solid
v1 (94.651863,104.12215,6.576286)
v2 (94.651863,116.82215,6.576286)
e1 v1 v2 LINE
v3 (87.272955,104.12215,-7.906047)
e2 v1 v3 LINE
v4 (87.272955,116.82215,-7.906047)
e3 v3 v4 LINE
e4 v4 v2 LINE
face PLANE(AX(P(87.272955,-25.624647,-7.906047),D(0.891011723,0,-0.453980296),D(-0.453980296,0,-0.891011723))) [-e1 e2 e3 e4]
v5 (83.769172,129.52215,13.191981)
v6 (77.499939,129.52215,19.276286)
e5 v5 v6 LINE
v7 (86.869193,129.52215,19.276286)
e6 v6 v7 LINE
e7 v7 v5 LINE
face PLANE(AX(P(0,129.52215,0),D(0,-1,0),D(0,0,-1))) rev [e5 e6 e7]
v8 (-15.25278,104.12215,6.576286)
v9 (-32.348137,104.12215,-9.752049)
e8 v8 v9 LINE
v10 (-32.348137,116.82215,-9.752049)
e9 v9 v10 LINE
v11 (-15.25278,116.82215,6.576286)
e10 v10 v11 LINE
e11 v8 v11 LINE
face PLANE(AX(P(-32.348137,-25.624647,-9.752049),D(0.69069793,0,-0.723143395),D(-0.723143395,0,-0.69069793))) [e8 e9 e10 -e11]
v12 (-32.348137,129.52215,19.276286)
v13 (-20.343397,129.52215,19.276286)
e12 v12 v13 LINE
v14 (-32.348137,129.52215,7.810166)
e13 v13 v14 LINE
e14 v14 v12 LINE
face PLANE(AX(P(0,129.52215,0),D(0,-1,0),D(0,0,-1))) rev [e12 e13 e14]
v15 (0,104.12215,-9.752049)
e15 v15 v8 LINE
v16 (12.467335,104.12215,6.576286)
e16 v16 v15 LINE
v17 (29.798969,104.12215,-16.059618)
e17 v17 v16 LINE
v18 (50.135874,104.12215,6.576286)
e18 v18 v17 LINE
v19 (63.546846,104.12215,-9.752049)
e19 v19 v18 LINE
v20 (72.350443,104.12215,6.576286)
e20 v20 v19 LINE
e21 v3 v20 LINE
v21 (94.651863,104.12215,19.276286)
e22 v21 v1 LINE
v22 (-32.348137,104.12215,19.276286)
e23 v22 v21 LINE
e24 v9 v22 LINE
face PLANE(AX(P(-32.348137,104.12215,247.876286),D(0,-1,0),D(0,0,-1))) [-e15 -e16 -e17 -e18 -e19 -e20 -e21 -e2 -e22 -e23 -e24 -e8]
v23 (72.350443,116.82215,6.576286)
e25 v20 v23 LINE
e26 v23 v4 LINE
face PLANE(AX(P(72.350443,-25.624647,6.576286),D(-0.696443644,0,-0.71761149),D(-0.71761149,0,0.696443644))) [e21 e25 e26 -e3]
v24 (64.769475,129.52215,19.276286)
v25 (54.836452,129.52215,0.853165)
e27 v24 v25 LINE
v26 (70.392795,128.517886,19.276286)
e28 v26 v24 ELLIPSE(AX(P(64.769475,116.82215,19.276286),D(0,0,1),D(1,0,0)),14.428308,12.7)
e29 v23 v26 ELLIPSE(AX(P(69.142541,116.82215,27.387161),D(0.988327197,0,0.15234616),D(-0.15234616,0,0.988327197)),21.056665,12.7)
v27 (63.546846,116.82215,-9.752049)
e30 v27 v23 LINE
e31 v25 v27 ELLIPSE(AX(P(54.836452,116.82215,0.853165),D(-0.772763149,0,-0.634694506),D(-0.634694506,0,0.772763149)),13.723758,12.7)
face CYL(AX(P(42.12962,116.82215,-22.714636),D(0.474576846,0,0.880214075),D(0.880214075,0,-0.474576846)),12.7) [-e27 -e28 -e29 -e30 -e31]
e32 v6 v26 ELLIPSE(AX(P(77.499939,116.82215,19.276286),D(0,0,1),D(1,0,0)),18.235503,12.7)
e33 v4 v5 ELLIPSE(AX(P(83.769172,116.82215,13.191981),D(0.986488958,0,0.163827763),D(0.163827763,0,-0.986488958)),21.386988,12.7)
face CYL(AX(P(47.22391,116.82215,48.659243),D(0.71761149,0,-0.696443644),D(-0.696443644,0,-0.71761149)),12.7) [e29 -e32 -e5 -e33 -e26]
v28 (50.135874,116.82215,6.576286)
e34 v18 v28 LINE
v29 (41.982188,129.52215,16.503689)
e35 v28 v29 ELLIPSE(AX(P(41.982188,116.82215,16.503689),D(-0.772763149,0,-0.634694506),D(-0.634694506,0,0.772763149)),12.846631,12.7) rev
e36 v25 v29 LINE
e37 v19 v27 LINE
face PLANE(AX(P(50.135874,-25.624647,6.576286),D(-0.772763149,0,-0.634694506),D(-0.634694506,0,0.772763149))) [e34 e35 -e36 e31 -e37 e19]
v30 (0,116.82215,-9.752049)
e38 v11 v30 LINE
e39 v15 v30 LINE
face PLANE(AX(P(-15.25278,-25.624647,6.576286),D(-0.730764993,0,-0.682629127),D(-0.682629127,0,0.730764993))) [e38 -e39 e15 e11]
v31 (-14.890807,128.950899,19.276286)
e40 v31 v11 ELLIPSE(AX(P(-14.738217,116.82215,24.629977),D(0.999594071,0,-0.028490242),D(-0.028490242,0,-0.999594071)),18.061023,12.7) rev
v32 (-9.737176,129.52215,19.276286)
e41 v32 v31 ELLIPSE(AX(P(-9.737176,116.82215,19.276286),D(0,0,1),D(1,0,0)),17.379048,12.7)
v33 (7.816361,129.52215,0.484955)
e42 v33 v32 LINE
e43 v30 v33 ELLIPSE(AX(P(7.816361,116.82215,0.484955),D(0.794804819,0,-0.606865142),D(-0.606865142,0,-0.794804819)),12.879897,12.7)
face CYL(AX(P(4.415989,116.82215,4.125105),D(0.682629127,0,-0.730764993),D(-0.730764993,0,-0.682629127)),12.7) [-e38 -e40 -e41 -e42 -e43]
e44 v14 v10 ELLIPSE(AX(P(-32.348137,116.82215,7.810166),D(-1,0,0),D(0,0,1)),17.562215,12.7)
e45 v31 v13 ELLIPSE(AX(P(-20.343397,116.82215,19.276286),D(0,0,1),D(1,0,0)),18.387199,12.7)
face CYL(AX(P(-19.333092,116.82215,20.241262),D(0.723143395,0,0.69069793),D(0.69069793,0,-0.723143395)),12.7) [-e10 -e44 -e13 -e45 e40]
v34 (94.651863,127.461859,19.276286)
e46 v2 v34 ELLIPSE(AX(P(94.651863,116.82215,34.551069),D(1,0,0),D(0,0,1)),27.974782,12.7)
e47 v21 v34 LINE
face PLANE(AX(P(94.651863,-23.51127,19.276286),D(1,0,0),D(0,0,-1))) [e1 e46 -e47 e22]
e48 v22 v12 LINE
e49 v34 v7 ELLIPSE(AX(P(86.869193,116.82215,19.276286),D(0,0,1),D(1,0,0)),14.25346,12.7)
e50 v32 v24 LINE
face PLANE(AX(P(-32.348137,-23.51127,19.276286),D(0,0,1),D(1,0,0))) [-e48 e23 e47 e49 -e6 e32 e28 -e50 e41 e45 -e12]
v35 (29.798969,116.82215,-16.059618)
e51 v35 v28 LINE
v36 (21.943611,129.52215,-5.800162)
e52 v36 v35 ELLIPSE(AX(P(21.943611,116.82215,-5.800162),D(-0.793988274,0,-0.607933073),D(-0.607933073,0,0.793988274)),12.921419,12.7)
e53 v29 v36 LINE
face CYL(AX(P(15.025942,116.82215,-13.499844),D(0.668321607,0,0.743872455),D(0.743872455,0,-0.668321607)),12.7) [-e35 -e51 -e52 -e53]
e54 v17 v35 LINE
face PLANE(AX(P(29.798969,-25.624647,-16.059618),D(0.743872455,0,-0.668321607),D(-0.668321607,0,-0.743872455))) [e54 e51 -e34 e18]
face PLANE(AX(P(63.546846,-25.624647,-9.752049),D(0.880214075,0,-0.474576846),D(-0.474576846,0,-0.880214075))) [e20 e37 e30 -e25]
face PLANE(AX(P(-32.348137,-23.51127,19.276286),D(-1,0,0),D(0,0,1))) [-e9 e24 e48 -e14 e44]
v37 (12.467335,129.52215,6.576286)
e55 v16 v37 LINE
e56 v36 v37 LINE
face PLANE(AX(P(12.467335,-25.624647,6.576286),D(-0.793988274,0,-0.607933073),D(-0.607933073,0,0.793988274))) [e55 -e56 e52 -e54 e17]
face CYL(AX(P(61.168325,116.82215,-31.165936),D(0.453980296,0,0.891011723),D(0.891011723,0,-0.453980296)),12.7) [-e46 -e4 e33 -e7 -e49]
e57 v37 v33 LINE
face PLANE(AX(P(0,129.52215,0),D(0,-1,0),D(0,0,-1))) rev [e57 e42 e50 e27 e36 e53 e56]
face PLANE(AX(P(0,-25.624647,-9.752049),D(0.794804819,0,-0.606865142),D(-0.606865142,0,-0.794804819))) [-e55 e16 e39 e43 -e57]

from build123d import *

# Parameters (mm, degrees)
SKETCH1_W           = 127
SKETCH1_H           = 12.7
BOSS_EXTRUDE1_DEPTH = 25.4
BOSS_EXTRUDE2_DEPTH = 25.4
FILLET2_R           = 12.7


with BuildPart() as part:
    # Sketch1 → Boss-Extrude1 (new body)
    with BuildSketch(Plane(origin=(0, 129.522150418, 0), x_dir=(1, 0, 0), z_dir=(0, 1, 0))):
        with Locations((31.151863223, -12.926286206)):
            Rectangle(SKETCH1_W, SKETCH1_H)
    extrude(amount=-BOSS_EXTRUDE1_DEPTH)

    # Sketch2 → Boss-Extrude2 (add)
    with BuildSketch(Plane(origin=(0, 129.522150418, 0), x_dir=(1, 0, 0), z_dir=(0, 1, 0))):
        Polygon((-32.348136777, -6.576286206), (-32.348136777, 9.752049173), (-15.252779509, -6.576286206), (0, 9.752049173), (12.467334528, -6.576286206), (29.798968938, 16.059617503), (50.135874056, -6.576286206), (63.546845791, 9.752049173), (72.350442693, -6.576286206), (87.272954796, 7.906046983), (94.651863223, -6.576286206), (94.651863223, -10.496577103), (-32.348136777, -10.496577103), align=None)
    extrude(amount=-BOSS_EXTRUDE2_DEPTH)

    # Fillet2
    # the kernel refuses this fillet: 12.7 mm, written as the material it takes off along each edge
    with BuildSketch(Plane(origin=(-55.307939563, 129.522150418, -31.681708451), x_dir=(0, -1, 0), z_dir=(0.7231433948257096, 0, 0.6906979300098909))) as fillet2_piece_1_section:
        with BuildLine():
            CenterArc((FILLET2_R, -FILLET2_R), FILLET2_R, 90, 90)
            Line((0, -FILLET2_R), (-FILLET2_R * 0.02, -FILLET2_R))
            Line((-FILLET2_R * 0.02, -FILLET2_R), (-FILLET2_R * 0.02, FILLET2_R * 0.02))
            Line((-FILLET2_R * 0.02, FILLET2_R * 0.02), (FILLET2_R, FILLET2_R * 0.02))
            Line((FILLET2_R, FILLET2_R * 0.02), (FILLET2_R, 0))
        make_face()
    fillet2_piece_1 = extrude(amount=87.140342137, mode=Mode.PRIVATE)
    fillet2_piece_1 = split(fillet2_piece_1, bisect_by=Plane(origin=(-32.348136777, 126.447150631, 1.093343092), z_dir=(1, 0, 0)), keep=Keep.TOP, mode=Mode.PRIVATE)
    fillet2_piece_1 = split(fillet2_piece_1, bisect_by=Plane(origin=(-16.904261861, 126.447150631, 8.344223498), z_dir=(-0.7307649934126457, 0, -0.682629126541357)), keep=Keep.TOP, mode=Mode.PRIVATE)
    add(fillet2_piece_1, mode=Mode.SUBTRACT)
    with BuildSketch(Plane(origin=(-36.926254277, 129.522150418, 29.778074747), x_dir=(0, -1, 0), z_dir=(0.682629126541357, 0, -0.7307649934126457))) as fillet2_piece_2_section:
        with BuildLine():
            CenterArc((FILLET2_R, -FILLET2_R), FILLET2_R, 90, 90)
            Line((0, -FILLET2_R), (-FILLET2_R * 0.02, -FILLET2_R))
            Line((-FILLET2_R * 0.02, -FILLET2_R), (-FILLET2_R * 0.02, FILLET2_R * 0.02))
            Line((-FILLET2_R * 0.02, FILLET2_R * 0.02), (FILLET2_R, FILLET2_R * 0.02))
            Line((FILLET2_R, FILLET2_R * 0.02), (FILLET2_R, 0))
        make_face()
    fillet2_piece_2 = extrude(amount=85.844167449, mode=Mode.PRIVATE)
    fillet2_piece_2 = split(fillet2_piece_2, bisect_by=Plane(origin=(-13.300421888, 126.615006844, 8.441046884), z_dir=(0.6906979300098909, 0, -0.7231433948257096)), keep=Keep.TOP, mode=Mode.PRIVATE)
    fillet2_piece_2 = split(fillet2_piece_2, bisect_by=Plane(origin=(2.843037706, 126.615006844, -6.02855294), z_dir=(-0.7948048188192111, 0, 0.6068651415114903)), keep=Keep.TOP, mode=Mode.PRIVATE)
    add(fillet2_piece_2, mode=Mode.SUBTRACT)
    with BuildSketch(Plane(origin=(72.859080389, 129.522150418, -36.195669189), x_dir=(0, -1, 0), z_dir=(0.45398029626708136, 0, 0.8910117230436719))) as fillet2_piece_3_section:
        with BuildLine():
            CenterArc((FILLET2_R, -FILLET2_R), FILLET2_R, 90, 90)
            Line((0, -FILLET2_R), (-FILLET2_R * 0.02, -FILLET2_R))
            Line((-FILLET2_R * 0.02, -FILLET2_R), (-FILLET2_R * 0.02, FILLET2_R * 0.02))
            Line((-FILLET2_R * 0.02, FILLET2_R * 0.02), (FILLET2_R, FILLET2_R * 0.02))
            Line((FILLET2_R, FILLET2_R * 0.02), (FILLET2_R, 0))
        make_face()
    fillet2_piece_3 = extrude(amount=79.753807682, mode=Mode.PRIVATE)
    fillet2_piece_3 = split(fillet2_piece_3, bisect_by=Plane(origin=(82.345210733, 126.995605854, -3.123659748), z_dir=(0.6964436437658211, 0, 0.7176114903331651)), keep=Keep.TOP, mode=Mode.PRIVATE)
    fillet2_piece_3 = split(fillet2_piece_3, bisect_by=Plane(origin=(94.651863223, 126.995605854, 4.414676038), z_dir=(-1, 0, 0)), keep=Keep.TOP, mode=Mode.PRIVATE)
    add(fillet2_piece_3, mode=Mode.SUBTRACT)
    with BuildSketch(Plane(origin=(49.566277875, 129.522150418, 28.688371895), x_dir=(0, -1, 0), z_dir=(0.7176114903331651, 0, -0.6964436437658211))) as fillet2_piece_4_section:
        with BuildLine():
            CenterArc((FILLET2_R, -FILLET2_R), FILLET2_R, 90, 90)
            Line((0, -FILLET2_R), (-FILLET2_R * 0.02, -FILLET2_R))
            Line((-FILLET2_R * 0.02, -FILLET2_R), (-FILLET2_R * 0.02, FILLET2_R * 0.02))
            Line((-FILLET2_R * 0.02, FILLET2_R * 0.02), (FILLET2_R, FILLET2_R * 0.02))
            Line((FILLET2_R, FILLET2_R * 0.02), (FILLET2_R, 0))
        make_face()
    fillet2_piece_4 = extrude(amount=84.294695045, mode=Mode.PRIVATE)
    fillet2_piece_4 = split(fillet2_piece_4, bisect_by=Plane(origin=(72.424381475, 126.641527383, 6.713423019), z_dir=(0.8802140747510399, 0, -0.4745768458428739)), keep=Keep.TOP, mode=Mode.PRIVATE)
    fillet2_piece_4 = split(fillet2_piece_4, bisect_by=Plane(origin=(90.021052177, 126.641527383, -2.512449501), z_dir=(-0.8910117230436719, 0, 0.45398029626708136)), keep=Keep.TOP, mode=Mode.PRIVATE)
    add(fillet2_piece_4, mode=Mode.SUBTRACT)
    with BuildSketch(Plane(origin=(48.479030935, 129.522150418, -37.698846047), x_dir=(0, -1, 0), z_dir=(0.47457684584287385, 0, 0.8802140747510397))) as fillet2_piece_5_section:
        with BuildLine():
            CenterArc((FILLET2_R, -FILLET2_R), FILLET2_R, 90, 90)
            Line((0, -FILLET2_R), (-FILLET2_R * 0.02, -FILLET2_R))
            Line((-FILLET2_R * 0.02, -FILLET2_R), (-FILLET2_R * 0.02, FILLET2_R * 0.02))
            Line((-FILLET2_R * 0.02, FILLET2_R * 0.02), (FILLET2_R, FILLET2_R * 0.02))
            Line((FILLET2_R, FILLET2_R * 0.02), (FILLET2_R, 0))
        make_face()
    fillet2_piece_5 = extrude(amount=82.050413868, mode=Mode.PRIVATE)
    fillet2_piece_5 = split(fillet2_piece_5, bisect_by=Plane(origin=(59.422424103, 126.616162938, -4.730418982), z_dir=(0.7727631490947523, 0, 0.6346945055703268)), keep=Keep.TOP, mode=Mode.PRIVATE)
    fillet2_piece_5 = split(fillet2_piece_5, bisect_by=Plane(origin=(72.023472886, 126.616162938, 6.893611175), z_dir=(-0.6964436437658211, 0, -0.7176114903331651)), keep=Keep.TOP, mode=Mode.PRIVATE)
    add(fillet2_piece_5, mode=Mode.SUBTRACT)
    with BuildSketch(Plane(origin=(8.579757917, 129.522150418, -39.677567957), x_dir=(0, -1, 0), z_dir=(0.668321606968674, 0, 0.7438724552359828))) as fillet2_piece_6_section:
        with BuildLine():
            CenterArc((FILLET2_R, -FILLET2_R), FILLET2_R, 90, 90)
            Line((0, -FILLET2_R), (-FILLET2_R * 0.02, -FILLET2_R))
            Line((-FILLET2_R * 0.02, -FILLET2_R), (-FILLET2_R * 0.02, FILLET2_R * 0.02))
            Line((-FILLET2_R * 0.02, FILLET2_R * 0.02), (FILLET2_R, FILLET2_R * 0.02))
            Line((FILLET2_R, FILLET2_R * 0.02), (FILLET2_R, 0))
        make_face()
    fillet2_piece_6 = extrude(amount=93.929818377, mode=Mode.PRIVATE)
    fillet2_piece_6 = split(fillet2_piece_6, bisect_by=Plane(origin=(26.326574594, 126.641800239, -11.524512379), z_dir=(0.7939882740207107, 0, 0.6079330725644171)), keep=Keep.TOP, mode=Mode.PRIVATE)
    fillet2_piece_6 = split(fillet2_piece_6, bisect_by=Plane(origin=(49.745548911, 126.641800239, 7.051520961), z_dir=(-0.7727631490947523, 0, -0.6346945055703268)), keep=Keep.TOP, mode=Mode.PRIVATE)
    add(fillet2_piece_6, mode=Mode.SUBTRACT)
    with BuildSketch(Plane(origin=(-55.307939563, 129.522150418, -31.681708451), x_dir=(0, -1, 0), z_dir=(0.7231433948257096, 0, 0.6906979300098909))) as fillet2_piece_7a_section:
        with BuildLine():
            CenterArc((FILLET2_R, -FILLET2_R), FILLET2_R, 90, 90)
            Line((0, -FILLET2_R), (-FILLET2_R * 0.02, -FILLET2_R))
            Line((-FILLET2_R * 0.02, -FILLET2_R), (-FILLET2_R * 0.02, FILLET2_R * 0.02))
            Line((-FILLET2_R * 0.02, FILLET2_R * 0.02), (FILLET2_R, FILLET2_R * 0.02))
            Line((FILLET2_R, FILLET2_R * 0.02), (FILLET2_R, 0))
        make_face()
    fillet2_piece_7a = extrude(amount=87.140342137, mode=Mode.PRIVATE)
    fillet2_piece_7a = split(fillet2_piece_7a, bisect_by=Plane(origin=(-17.333974575, 126.645382706, 8.804237577), z_dir=(0.7307649934126457, 0, 0.682629126541357)), keep=Keep.TOP, mode=Mode.PRIVATE)
    with BuildSketch(Plane(origin=(-36.926254277, 129.522150418, 29.778074747), x_dir=(0, -1, 0), z_dir=(0.682629126541357, 0, -0.7307649934126457))) as fillet2_piece_7b_section:
        with BuildLine():
            CenterArc((FILLET2_R, -FILLET2_R), FILLET2_R, 90, 90)
            Line((0, -FILLET2_R), (-FILLET2_R * 0.02, -FILLET2_R))
            Line((-FILLET2_R * 0.02, -FILLET2_R), (-FILLET2_R * 0.02, FILLET2_R * 0.02))
            Line((-FILLET2_R * 0.02, FILLET2_R * 0.02), (FILLET2_R, FILLET2_R * 0.02))
            Line((FILLET2_R, FILLET2_R * 0.02), (FILLET2_R, 0))
        make_face()
    fillet2_piece_7b = extrude(amount=85.844167449, mode=Mode.PRIVATE)
    fillet2_piece_7b = split(fillet2_piece_7b, bisect_by=Plane(origin=(-13.048064816, 126.645382706, 8.682081385), z_dir=(-0.6906979300098909, 0, 0.7231433948257096)), keep=Keep.TOP, mode=Mode.PRIVATE)
    fillet2_piece_7 = fillet2_piece_7a & fillet2_piece_7b
    add(fillet2_piece_7, mode=Mode.SUBTRACT)
    with BuildSketch(Plane(origin=(49.566277875, 129.522150418, 28.688371895), x_dir=(0, -1, 0), z_dir=(0.7176114903331651, 0, -0.6964436437658211))) as fillet2_piece_8a_section:
        with BuildLine():
            CenterArc((FILLET2_R, -FILLET2_R), FILLET2_R, 90, 90)
            Line((0, -FILLET2_R), (-FILLET2_R * 0.02, -FILLET2_R))
            Line((-FILLET2_R * 0.02, -FILLET2_R), (-FILLET2_R * 0.02, FILLET2_R * 0.02))
            Line((-FILLET2_R * 0.02, FILLET2_R * 0.02), (FILLET2_R, FILLET2_R * 0.02))
            Line((FILLET2_R, FILLET2_R * 0.02), (FILLET2_R, 0))
        make_face()
    fillet2_piece_8a = extrude(amount=84.294695045, mode=Mode.PRIVATE)
    fillet2_piece_8a = split(fillet2_piece_8a, bisect_by=Plane(origin=(86.487490403, 126.688787651, -9.447651295), z_dir=(0.8910117230436719, 0, -0.45398029626708136)), keep=Keep.TOP, mode=Mode.PRIVATE)
    with BuildSketch(Plane(origin=(72.859080389, 129.522150418, -36.195669189), x_dir=(0, -1, 0), z_dir=(0.45398029626708136, 0, 0.8910117230436719))) as fillet2_piece_8b_section:
        with BuildLine():
            CenterArc((FILLET2_R, -FILLET2_R), FILLET2_R, 90, 90)
            Line((0, -FILLET2_R), (-FILLET2_R * 0.02, -FILLET2_R))
            Line((-FILLET2_R * 0.02, -FILLET2_R), (-FILLET2_R * 0.02, FILLET2_R * 0.02))
            Line((-FILLET2_R * 0.02, FILLET2_R * 0.02), (FILLET2_R, FILLET2_R * 0.02))
            Line((FILLET2_R, FILLET2_R * 0.02), (FILLET2_R, 0))
        make_face()
    fillet2_piece_8b = extrude(amount=79.753807682, mode=Mode.PRIVATE)
    fillet2_piece_8b = split(fillet2_piece_8b, bisect_by=Plane(origin=(88.514546729, 126.688787651, -9.111014882), z_dir=(-0.6964436437658211, 0, -0.7176114903331651)), keep=Keep.TOP, mode=Mode.PRIVATE)
    fillet2_piece_8 = fillet2_piece_8a & fillet2_piece_8b
    add(fillet2_piece_8, mode=Mode.SUBTRACT)
    with BuildSketch(Plane(origin=(48.479030935, 129.522150418, -37.698846047), x_dir=(0, -1, 0), z_dir=(0.47457684584287385, 0, 0.8802140747510397))) as fillet2_piece_9a_section:
        with BuildLine():
            CenterArc((FILLET2_R, -FILLET2_R), FILLET2_R, 90, 90)
            Line((0, -FILLET2_R), (-FILLET2_R * 0.02, -FILLET2_R))
            Line((-FILLET2_R * 0.02, -FILLET2_R), (-FILLET2_R * 0.02, FILLET2_R * 0.02))
            Line((-FILLET2_R * 0.02, FILLET2_R * 0.02), (FILLET2_R, FILLET2_R * 0.02))
            Line((FILLET2_R, FILLET2_R * 0.02), (FILLET2_R, 0))
        make_face()
    fillet2_piece_9a = extrude(amount=82.050413868, mode=Mode.PRIVATE)
    fillet2_piece_9a = split(fillet2_piece_9a, bisect_by=Plane(origin=(67.231034688, 126.606396311, 11.544683748), z_dir=(0.6964436437658211, 0, 0.7176114903331651)), keep=Keep.TOP, mode=Mode.PRIVATE)
    with BuildSketch(Plane(origin=(49.566277875, 129.522150418, 28.688371895), x_dir=(0, -1, 0), z_dir=(0.7176114903331651, 0, -0.6964436437658211))) as fillet2_piece_9b_section:
        with BuildLine():
            CenterArc((FILLET2_R, -FILLET2_R), FILLET2_R, 90, 90)
            Line((0, -FILLET2_R), (-FILLET2_R * 0.02, -FILLET2_R))
            Line((-FILLET2_R * 0.02, -FILLET2_R), (-FILLET2_R * 0.02, FILLET2_R * 0.02))
            Line((-FILLET2_R * 0.02, FILLET2_R * 0.02), (FILLET2_R, FILLET2_R * 0.02))
            Line((FILLET2_R, FILLET2_R * 0.02), (FILLET2_R, 0))
        make_face()
    fillet2_piece_9b = extrude(amount=84.294695045, mode=Mode.PRIVATE)
    fillet2_piece_9b = split(fillet2_piece_9b, bisect_by=Plane(origin=(75.736052506, 126.606396311, 12.855693714), z_dir=(-0.8802140747510399, 0, 0.4745768458428739)), keep=Keep.TOP, mode=Mode.PRIVATE)
    fillet2_piece_9 = fillet2_piece_9a & fillet2_piece_9b
    add(fillet2_piece_9, mode=Mode.SUBTRACT)


solid = part.part
